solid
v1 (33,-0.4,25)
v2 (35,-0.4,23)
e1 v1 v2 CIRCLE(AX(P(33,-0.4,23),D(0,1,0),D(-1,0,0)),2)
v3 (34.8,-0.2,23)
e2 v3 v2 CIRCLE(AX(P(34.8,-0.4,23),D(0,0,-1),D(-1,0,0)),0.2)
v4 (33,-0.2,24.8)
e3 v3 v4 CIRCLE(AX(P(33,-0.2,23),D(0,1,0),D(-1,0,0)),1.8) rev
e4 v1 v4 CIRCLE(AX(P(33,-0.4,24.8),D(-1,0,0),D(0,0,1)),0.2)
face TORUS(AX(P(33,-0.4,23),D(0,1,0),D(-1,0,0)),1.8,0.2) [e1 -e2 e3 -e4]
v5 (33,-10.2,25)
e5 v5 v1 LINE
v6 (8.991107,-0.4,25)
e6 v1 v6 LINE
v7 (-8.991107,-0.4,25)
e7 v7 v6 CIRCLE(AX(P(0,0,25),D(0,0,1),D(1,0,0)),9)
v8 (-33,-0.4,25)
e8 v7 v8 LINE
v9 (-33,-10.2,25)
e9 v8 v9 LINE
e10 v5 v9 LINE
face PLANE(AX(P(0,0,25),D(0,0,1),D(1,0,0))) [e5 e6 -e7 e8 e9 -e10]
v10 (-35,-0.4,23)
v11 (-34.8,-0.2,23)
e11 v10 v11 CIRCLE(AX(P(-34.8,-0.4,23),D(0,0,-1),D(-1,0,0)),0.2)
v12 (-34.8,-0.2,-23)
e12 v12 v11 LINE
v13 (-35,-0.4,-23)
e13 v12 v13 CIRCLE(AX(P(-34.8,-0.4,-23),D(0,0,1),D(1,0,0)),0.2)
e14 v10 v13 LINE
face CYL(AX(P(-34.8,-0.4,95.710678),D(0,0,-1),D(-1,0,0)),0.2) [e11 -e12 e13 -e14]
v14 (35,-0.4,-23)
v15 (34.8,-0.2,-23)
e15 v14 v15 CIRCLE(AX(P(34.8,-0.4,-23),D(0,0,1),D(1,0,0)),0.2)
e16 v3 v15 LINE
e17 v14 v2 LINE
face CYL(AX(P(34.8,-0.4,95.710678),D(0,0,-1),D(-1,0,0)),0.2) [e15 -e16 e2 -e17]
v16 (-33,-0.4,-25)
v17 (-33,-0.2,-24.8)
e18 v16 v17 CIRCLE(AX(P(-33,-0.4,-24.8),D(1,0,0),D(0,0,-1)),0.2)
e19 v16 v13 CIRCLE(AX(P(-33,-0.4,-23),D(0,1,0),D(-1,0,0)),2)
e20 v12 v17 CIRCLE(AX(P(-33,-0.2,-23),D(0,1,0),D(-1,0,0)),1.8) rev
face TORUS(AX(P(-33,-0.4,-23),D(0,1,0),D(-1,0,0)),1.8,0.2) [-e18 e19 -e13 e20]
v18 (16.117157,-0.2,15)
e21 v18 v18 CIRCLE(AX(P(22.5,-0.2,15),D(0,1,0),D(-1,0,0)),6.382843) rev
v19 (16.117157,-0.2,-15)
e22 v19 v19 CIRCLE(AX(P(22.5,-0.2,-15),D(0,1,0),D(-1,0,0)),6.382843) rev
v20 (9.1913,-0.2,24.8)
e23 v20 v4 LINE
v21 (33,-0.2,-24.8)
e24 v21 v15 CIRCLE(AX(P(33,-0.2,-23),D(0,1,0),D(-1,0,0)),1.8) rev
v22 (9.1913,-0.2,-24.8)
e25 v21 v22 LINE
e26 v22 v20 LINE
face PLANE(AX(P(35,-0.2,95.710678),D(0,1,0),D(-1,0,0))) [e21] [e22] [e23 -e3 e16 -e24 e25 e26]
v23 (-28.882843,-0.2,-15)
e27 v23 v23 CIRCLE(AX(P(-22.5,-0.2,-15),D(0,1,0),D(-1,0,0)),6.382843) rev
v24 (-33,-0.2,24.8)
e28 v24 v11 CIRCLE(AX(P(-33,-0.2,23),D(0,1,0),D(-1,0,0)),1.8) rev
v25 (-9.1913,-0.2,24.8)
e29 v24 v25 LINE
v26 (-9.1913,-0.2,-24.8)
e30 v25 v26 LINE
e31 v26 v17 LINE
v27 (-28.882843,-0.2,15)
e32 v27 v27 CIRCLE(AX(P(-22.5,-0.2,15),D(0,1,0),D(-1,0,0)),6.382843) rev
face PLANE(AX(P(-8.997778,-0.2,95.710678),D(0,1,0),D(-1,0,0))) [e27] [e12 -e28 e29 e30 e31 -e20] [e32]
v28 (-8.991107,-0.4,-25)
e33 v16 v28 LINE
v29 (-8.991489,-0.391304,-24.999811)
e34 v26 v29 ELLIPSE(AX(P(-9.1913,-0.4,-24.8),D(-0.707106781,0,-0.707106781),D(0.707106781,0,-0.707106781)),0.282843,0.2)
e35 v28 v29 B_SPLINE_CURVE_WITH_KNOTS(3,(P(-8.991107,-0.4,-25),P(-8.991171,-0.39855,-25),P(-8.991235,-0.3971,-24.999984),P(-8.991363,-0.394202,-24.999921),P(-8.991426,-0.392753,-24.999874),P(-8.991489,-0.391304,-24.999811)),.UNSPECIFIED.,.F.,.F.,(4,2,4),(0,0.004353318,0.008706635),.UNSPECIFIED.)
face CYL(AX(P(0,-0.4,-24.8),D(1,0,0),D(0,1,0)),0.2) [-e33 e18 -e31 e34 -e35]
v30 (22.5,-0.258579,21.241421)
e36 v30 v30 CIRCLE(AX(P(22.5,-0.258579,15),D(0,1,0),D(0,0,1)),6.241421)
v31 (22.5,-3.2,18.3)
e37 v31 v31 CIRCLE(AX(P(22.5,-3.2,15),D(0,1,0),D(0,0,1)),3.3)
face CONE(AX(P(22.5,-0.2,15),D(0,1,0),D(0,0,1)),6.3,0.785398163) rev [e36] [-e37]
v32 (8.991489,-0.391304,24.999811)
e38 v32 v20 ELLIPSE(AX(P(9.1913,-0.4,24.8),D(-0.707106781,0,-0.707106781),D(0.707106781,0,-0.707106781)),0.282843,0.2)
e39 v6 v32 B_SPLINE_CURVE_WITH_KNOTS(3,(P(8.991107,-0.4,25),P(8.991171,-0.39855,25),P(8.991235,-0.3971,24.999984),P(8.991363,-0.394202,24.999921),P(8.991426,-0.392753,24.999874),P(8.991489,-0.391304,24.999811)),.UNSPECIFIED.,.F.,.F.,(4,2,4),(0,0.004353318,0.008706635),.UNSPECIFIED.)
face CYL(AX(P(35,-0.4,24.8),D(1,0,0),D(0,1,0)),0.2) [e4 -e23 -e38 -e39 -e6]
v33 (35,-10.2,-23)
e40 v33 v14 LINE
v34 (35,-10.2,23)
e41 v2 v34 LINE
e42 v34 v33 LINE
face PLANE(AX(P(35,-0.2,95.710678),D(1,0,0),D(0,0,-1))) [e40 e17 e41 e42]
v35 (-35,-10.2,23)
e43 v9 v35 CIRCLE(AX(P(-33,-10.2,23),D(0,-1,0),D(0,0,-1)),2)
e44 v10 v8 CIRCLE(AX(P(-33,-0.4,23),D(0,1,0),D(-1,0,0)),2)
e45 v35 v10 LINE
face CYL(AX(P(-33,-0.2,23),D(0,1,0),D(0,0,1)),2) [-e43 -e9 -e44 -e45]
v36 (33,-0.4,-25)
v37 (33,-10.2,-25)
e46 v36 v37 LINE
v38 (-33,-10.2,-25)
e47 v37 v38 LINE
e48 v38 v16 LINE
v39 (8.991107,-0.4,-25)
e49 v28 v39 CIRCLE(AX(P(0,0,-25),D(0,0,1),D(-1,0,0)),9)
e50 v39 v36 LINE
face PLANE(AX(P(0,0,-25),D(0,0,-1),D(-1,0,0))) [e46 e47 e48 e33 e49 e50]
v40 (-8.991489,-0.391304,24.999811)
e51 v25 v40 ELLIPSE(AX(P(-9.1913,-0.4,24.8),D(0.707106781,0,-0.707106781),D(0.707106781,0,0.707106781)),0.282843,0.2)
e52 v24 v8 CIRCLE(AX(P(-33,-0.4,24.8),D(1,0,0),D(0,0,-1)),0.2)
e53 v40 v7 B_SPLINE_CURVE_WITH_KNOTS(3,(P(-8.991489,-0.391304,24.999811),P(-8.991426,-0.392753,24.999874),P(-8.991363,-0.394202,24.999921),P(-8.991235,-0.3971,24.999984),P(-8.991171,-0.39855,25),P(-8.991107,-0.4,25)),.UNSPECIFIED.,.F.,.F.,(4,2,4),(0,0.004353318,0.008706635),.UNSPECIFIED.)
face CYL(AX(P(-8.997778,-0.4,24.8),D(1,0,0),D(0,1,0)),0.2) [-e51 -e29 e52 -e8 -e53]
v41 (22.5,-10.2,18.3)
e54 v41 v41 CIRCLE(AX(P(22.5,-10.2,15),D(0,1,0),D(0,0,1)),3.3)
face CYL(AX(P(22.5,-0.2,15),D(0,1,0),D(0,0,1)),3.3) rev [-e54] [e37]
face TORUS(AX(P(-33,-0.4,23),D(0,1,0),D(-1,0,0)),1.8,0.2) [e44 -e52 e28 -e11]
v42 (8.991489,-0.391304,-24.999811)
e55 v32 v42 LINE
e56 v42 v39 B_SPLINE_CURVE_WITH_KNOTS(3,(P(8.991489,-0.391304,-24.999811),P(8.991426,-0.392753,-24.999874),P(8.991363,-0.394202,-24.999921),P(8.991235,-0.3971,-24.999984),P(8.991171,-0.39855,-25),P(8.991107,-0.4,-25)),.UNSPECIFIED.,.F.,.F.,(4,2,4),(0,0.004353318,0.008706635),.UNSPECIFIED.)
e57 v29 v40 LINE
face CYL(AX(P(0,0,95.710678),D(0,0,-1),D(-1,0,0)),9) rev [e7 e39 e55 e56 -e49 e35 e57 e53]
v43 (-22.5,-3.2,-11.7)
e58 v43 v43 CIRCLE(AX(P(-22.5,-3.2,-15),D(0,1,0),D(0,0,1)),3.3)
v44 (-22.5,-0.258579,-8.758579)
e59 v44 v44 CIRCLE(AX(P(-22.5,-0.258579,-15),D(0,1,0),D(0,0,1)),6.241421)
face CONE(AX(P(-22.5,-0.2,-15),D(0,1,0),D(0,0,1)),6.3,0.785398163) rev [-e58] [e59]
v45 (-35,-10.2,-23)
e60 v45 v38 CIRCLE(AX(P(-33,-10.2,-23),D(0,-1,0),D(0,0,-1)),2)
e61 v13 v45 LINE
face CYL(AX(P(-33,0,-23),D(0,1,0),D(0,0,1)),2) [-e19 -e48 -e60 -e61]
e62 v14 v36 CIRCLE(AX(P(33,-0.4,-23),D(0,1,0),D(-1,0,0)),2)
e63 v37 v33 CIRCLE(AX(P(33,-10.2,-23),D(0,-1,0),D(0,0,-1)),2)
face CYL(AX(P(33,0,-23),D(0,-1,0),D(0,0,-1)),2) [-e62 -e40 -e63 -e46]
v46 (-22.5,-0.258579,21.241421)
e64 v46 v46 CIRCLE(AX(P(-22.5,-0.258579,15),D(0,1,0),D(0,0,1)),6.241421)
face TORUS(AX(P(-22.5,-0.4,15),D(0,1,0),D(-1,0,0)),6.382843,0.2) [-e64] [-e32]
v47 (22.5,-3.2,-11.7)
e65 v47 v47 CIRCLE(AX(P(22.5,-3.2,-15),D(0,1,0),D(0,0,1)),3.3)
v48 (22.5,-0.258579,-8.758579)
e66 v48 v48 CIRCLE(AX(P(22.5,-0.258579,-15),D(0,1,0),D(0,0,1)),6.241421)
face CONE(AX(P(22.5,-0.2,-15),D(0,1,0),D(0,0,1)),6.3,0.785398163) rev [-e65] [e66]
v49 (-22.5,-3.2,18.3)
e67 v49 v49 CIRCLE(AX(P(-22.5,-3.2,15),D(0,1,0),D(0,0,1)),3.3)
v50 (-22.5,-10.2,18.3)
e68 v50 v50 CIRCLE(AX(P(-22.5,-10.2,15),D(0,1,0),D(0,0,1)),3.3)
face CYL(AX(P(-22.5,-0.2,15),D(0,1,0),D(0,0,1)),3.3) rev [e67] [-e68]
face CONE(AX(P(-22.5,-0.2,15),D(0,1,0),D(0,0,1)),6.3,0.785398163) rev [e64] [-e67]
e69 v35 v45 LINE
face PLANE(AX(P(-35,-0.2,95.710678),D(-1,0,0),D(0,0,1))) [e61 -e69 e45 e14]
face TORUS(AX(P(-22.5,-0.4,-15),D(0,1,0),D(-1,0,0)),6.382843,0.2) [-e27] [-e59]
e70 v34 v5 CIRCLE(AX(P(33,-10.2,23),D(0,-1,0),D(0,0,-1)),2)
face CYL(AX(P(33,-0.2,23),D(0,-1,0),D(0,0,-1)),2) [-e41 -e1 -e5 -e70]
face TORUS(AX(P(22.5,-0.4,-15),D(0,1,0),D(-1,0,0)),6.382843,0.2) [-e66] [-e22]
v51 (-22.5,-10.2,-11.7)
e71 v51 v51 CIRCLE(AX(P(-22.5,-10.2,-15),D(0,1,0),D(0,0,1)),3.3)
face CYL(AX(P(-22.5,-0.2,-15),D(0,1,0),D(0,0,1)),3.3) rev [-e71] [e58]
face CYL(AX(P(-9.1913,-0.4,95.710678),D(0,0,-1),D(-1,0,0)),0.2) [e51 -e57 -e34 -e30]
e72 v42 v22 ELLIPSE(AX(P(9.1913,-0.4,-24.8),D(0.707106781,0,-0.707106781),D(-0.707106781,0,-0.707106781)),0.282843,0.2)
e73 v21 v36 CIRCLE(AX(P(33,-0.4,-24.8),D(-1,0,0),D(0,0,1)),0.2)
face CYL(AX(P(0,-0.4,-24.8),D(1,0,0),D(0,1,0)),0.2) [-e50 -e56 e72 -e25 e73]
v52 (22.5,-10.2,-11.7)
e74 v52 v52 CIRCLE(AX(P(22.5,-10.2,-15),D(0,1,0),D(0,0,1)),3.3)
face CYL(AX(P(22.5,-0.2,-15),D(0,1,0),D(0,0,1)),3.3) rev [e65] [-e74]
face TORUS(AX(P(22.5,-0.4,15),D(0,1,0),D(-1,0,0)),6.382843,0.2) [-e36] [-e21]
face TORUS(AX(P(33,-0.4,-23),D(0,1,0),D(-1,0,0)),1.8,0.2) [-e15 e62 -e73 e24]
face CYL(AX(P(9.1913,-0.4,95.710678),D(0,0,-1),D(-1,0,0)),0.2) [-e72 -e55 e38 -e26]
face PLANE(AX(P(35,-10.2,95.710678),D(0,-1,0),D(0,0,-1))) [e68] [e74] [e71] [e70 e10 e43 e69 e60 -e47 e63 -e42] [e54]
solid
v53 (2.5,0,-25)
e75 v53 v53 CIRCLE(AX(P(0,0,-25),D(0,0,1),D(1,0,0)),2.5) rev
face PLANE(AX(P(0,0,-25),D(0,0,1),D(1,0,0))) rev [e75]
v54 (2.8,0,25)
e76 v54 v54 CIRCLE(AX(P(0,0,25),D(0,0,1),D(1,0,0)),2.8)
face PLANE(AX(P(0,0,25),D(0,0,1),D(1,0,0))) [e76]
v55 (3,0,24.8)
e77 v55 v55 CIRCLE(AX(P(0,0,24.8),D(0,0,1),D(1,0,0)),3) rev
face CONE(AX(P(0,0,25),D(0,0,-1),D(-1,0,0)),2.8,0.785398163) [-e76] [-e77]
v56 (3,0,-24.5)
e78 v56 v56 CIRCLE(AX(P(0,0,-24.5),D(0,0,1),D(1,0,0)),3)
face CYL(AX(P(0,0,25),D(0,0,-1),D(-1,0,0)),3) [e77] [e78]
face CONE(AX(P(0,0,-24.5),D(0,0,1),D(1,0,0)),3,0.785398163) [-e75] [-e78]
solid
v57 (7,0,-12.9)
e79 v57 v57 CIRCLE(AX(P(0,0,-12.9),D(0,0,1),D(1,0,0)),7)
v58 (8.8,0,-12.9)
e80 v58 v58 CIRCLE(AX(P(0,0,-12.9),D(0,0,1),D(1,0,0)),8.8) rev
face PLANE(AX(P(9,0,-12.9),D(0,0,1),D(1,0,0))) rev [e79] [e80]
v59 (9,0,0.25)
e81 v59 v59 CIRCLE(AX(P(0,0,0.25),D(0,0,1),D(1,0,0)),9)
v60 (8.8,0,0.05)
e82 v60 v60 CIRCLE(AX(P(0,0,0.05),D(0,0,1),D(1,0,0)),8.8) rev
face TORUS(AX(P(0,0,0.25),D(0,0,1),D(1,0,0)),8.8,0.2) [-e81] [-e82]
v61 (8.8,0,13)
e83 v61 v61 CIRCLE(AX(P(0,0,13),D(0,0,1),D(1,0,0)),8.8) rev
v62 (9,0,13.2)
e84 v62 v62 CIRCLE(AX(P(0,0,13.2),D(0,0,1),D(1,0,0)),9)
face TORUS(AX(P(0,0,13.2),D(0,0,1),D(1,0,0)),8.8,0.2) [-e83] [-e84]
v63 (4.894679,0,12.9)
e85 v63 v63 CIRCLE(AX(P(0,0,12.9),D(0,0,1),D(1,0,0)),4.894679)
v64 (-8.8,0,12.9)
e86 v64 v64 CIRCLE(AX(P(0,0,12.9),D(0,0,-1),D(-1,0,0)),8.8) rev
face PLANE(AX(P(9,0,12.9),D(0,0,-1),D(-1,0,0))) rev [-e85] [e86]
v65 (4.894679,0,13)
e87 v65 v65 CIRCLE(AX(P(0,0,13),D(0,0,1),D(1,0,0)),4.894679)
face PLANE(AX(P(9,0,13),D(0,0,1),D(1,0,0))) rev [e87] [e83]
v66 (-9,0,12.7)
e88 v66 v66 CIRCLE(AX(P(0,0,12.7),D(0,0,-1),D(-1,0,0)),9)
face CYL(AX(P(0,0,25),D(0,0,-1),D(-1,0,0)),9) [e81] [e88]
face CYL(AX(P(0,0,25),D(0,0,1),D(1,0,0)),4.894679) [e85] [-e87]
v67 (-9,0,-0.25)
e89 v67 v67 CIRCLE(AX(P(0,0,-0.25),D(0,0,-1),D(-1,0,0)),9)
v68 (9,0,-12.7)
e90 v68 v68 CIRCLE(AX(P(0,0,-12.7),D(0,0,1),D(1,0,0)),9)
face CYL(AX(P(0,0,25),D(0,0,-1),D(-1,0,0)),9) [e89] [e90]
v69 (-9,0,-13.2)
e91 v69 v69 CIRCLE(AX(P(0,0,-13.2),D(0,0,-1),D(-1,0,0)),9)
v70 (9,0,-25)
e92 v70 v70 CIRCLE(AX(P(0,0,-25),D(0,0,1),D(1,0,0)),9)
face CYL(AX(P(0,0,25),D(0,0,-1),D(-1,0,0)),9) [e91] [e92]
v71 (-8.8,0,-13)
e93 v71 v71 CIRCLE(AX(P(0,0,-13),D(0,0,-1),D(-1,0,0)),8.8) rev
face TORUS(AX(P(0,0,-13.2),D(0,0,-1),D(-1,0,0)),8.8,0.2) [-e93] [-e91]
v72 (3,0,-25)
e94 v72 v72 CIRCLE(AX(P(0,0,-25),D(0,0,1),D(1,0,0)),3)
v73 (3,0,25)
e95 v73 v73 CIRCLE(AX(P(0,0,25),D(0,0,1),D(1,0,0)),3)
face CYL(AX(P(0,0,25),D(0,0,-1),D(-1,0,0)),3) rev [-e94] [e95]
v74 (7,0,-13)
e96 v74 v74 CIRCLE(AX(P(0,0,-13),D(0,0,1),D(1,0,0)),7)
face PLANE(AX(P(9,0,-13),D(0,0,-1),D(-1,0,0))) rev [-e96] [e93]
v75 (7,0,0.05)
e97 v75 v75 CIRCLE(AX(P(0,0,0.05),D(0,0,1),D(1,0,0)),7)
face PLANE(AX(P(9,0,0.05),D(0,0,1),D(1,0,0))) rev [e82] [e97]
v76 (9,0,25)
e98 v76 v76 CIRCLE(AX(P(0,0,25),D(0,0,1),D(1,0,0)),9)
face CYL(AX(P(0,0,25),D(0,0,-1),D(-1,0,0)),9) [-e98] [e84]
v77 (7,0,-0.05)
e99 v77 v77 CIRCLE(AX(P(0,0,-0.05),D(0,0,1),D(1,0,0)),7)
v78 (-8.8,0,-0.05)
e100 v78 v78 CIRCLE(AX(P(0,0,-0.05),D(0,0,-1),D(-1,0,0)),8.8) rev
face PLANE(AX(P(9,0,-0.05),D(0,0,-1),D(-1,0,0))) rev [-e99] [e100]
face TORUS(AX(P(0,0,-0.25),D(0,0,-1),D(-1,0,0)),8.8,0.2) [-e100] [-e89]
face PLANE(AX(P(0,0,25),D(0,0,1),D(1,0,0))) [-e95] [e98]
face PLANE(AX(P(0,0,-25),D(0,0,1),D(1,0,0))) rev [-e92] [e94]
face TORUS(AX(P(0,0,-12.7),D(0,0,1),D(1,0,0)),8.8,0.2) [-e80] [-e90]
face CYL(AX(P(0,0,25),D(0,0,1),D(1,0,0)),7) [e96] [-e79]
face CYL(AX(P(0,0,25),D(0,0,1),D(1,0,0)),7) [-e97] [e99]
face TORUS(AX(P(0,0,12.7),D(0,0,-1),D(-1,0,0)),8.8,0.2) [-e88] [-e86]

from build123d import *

# Parameters (mm, degrees)
SKETCH_1_R                  = 9
SKETCH_1_R_2                = 3
EXTRUDE_1_DEPTH             = 25
SKETCH_2_R                  = 3
EXTRUDE_2_DEPTH             = 25
CHAMFER_1_SIZE              = 0.2
SKETCH_3_W                  = 2
SKETCH_3_H                  = 0.1
SKETCH_3_W_2                = 4.105320606
FILLET_1_R                  = 0.2
EXTRUDE_6_DEPTH             = 50
HOLE_WIZARD_M6_1_AT_2_COUNT = 2
HOLE_WIZARD_M6_1_AT_2_PITCH = 45
HOLE_WIZARD_M6_1_AT_3_COUNT = 2
HOLE_WIZARD_M6_1_AT_3_PITCH = 30
HOLE_WIZARD_M6_1_AT_4_COUNT = 2
HOLE_WIZARD_M6_1_AT_4_PITCH = 54.083269132
FILLET_2_R                  = 0.2
FILLET_3_R                  = 2
CHAMFER_2_SIZE              = 0.5


with BuildPart() as part:
    # 草图1 → 凸台-拉伸1 (new, symmetric)
    with BuildSketch(Plane.XY):
        Circle(SKETCH_1_R)
        Circle(SKETCH_1_R_2, mode=Mode.SUBTRACT)
    extrude(amount=EXTRUDE_1_DEPTH, both=True)

    # 草图3 → 切除-旋转1 (revolve, cut)
    with BuildSketch(Plane(origin=(0, 0, 0), x_dir=(1, 0, 0), z_dir=(0, 1, 0))):
        with Locations((8, 12.95)):
            Rectangle(SKETCH_3_W, SKETCH_3_H)
        with Locations((8, 0)):
            Rectangle(SKETCH_3_W, SKETCH_3_H)
        with Locations((6.947339697, -12.95)):
            Rectangle(SKETCH_3_W_2, SKETCH_3_H)
    revolve(axis=Axis((0, 0, 25), (0, 0, -1)), mode=Mode.SUBTRACT)

    # 圆角1
    fillet_1_edges = [part.edges().sort_by_distance(p)[0] for p in [
        (-9, 0, -13),
        (-9, 0, -12.9),
        (-9, 0, -0.05),
        (-9, 0, 0.05),
        (-9, 0, 12.9),
        (-9, 0, 13),
    ]]
    fillet(fillet_1_edges, radius=FILLET_1_R)


with BuildPart() as body_2:
    # 草图2 → 凸台-拉伸2 (new, symmetric)
    with BuildSketch(Plane.XY):
        Circle(SKETCH_2_R)
    extrude(amount=EXTRUDE_2_DEPTH, both=True)

    # 倒角1
    chamfer_1_edges = [body_2.edges().sort_by_distance(p)[0] for p in [
        (-3, 0, 25),
    ]]
    chamfer(chamfer_1_edges, length=CHAMFER_1_SIZE)

    # 倒角2
    chamfer_2_edges = [body_2.edges().sort_by_distance(p)[0] for p in [
        (-3, 0, -25),
    ]]
    chamfer(chamfer_2_edges, length=CHAMFER_2_SIZE)


with BuildPart() as body_3:
    # 草图5 → 凸台-拉伸6 (new body)
    with BuildSketch(Plane(origin=(0, 0, -25), x_dir=(-1, 0, 0), z_dir=(0, 0, -1))):
        with BuildLine():
            Line((8.997777503, -0.2), (35, -0.2))
            Line((35, -0.2), (35, -10.2))
            Line((35, -10.2), (-35, -10.2))
            Line((-35, -10.2), (-35, -0.2))
            Line((-35, -0.2), (-8.997777503, -0.2))
            ThreePointArc((-8.997777503, -0.2), (0, -9), (8.997777503, -0.2))
        make_face()
    extrude(amount=-EXTRUDE_6_DEPTH)

    # 草图6 → M6 平头机械螺钉的锥形沉头孔1 (revolve, cut)
    with BuildSketch(Plane(origin=(-22.5, -0.2, -15), x_dir=(0, 0, 1), z_dir=(1, 0, 0))):
        Polygon((0, 0), (0, 10), (3.3, 10), (3.3, 3), (6.3, 0), align=None)
    hole_wizard_m6_1 = revolve(axis=Axis((-22.5, 6.15, -15), (0, -1, 0)), mode=Mode.SUBTRACT)

    # M6 平头机械螺钉的锥形沉头孔1 at 2: M6 平头机械螺钉的锥形沉头孔1 ×2
    with Locations(*[(i * HOLE_WIZARD_M6_1_AT_2_PITCH, 0, 0) for i in range(1, HOLE_WIZARD_M6_1_AT_2_COUNT)]):
        add(hole_wizard_m6_1, mode=Mode.SUBTRACT)

    # M6 平头机械螺钉的锥形沉头孔1 at 3: M6 平头机械螺钉的锥形沉头孔1 ×2
    with Locations(*[(0, 0, i * HOLE_WIZARD_M6_1_AT_3_PITCH) for i in range(1, HOLE_WIZARD_M6_1_AT_3_COUNT)]):
        add(hole_wizard_m6_1, mode=Mode.SUBTRACT)

    # M6 平头机械螺钉的锥形沉头孔1 at 4: M6 平头机械螺钉的锥形沉头孔1 ×2
    with Locations(*[Vector(0.8320502943378437, 0, 0.5547001962252291) * (i * HOLE_WIZARD_M6_1_AT_4_PITCH) for i in range(1, HOLE_WIZARD_M6_1_AT_4_COUNT)]):
        add(hole_wizard_m6_1, mode=Mode.SUBTRACT)

    # 圆角2
    # the kernel refuses this fillet: 0.2 mm, written as the material it takes off along each edge
    with BuildSketch(Plane(origin=(-8.497777503, -0.2, -25), x_dir=(0, 0, 1), z_dir=(-1, 0, 0)), Plane(origin=(35.5, -0.2, -25), x_dir=(0, 0, 1), z_dir=(-1, 0, 0))) as fillet_2_piece_1:
        with BuildLine():
            CenterArc((FILLET_2_R, -FILLET_2_R), FILLET_2_R, 90, 90)
            Line((0, -FILLET_2_R), (0, 0))
            Line((0, 0), (FILLET_2_R, 0))
        make_face()
    extrude(amount=27.002222497, mode=Mode.SUBTRACT)
    with BuildSketch(Plane(origin=(22.5, -0.2, 15), x_dir=(0, 0, 1), z_dir=(1, 0, 0))) as fillet_2_piece_2:
        with BuildLine():
            CenterArc((6.3 + FILLET_2_R * 0.414213562373, FILLET_2_R), FILLET_2_R, 225, 45)
            Line((6.3 - FILLET_2_R * 0.292893218813, FILLET_2_R * 0.292893218813), (6.3, 0))
            Line((6.3, 0), (6.3 + FILLET_2_R * 0.414213562373, 0))
        make_face()
    revolve(axis=Axis((22.5, -0.2, 15), (0, -1, 0)), mode=Mode.SUBTRACT)
    with BuildSketch(Plane(origin=(-22.5, -0.2, 15), x_dir=(0, 0, 1), z_dir=(1, 0, 0))) as fillet_2_piece_3:
        with BuildLine():
            CenterArc((6.3 + FILLET_2_R * 0.414213562373, FILLET_2_R), FILLET_2_R, 225, 45)
            Line((6.3 - FILLET_2_R * 0.292893218813, FILLET_2_R * 0.292893218813), (6.3, 0))
            Line((6.3, 0), (6.3 + FILLET_2_R * 0.414213562373, 0))
        make_face()
    revolve(axis=Axis((-22.5, -0.2, 15), (0, -1, 0)), mode=Mode.SUBTRACT)
    with BuildSketch(Plane(origin=(-35, -0.2, -25.5), x_dir=(1, 0, 0), z_dir=(0, 0, 1))) as fillet_2_piece_4:
        with BuildLine():
            CenterArc((FILLET_2_R, -FILLET_2_R), FILLET_2_R, 90, 90)
            Line((0, -FILLET_2_R), (0, 0))
            Line((0, 0), (FILLET_2_R, 0))
        make_face()
    extrude(amount=51, mode=Mode.SUBTRACT)
    with BuildSketch(Plane(origin=(-8.497777503, -0.2, 25), x_dir=(0, 0, -1), z_dir=(-1, 0, 0)), Plane(origin=(35.5, -0.2, 25), x_dir=(0, 0, -1), z_dir=(-1, 0, 0))) as fillet_2_piece_5:
        with BuildLine():
            CenterArc((FILLET_2_R, FILLET_2_R), FILLET_2_R, 180, 90)
            Line((0, FILLET_2_R), (0, 0))
            Line((0, 0), (FILLET_2_R, 0))
        make_face()
    extrude(amount=27.002222497, mode=Mode.SUBTRACT)
    with BuildSketch(Plane(origin=(22.5, -0.2, -15), x_dir=(0, 0, 1), z_dir=(1, 0, 0))) as fillet_2_piece_6:
        with BuildLine():
            CenterArc((6.3 + FILLET_2_R * 0.414213562373, FILLET_2_R), FILLET_2_R, 225, 45)
            Line((6.3 - FILLET_2_R * 0.292893218813, FILLET_2_R * 0.292893218813), (6.3, 0))
            Line((6.3, 0), (6.3 + FILLET_2_R * 0.414213562373, 0))
        make_face()
    revolve(axis=Axis((22.5, -0.2, -15), (0, -1, 0)), mode=Mode.SUBTRACT)
    with BuildSketch(Plane(origin=(-8.997777503, -0.2, -25.483806828), x_dir=(0.03285209900407031, -0.9994602241165111, 0), z_dir=(0, 0, 1))) as fillet_2_piece_7:
        with BuildLine():
            CenterArc((0.193534417, -0.199988692), FILLET_2_R, 90.609281004, 87.508093631)
            Line((-0.006357628, -0.193418272), (0, 0))
            ThreePointArc((0, 0), (0.095703833, -0.00050886), (0.191407665, 0))
        make_face()
    extrude(amount=50.967613655, mode=Mode.SUBTRACT)
    with BuildSketch(Plane(origin=(8.997777503, -0.2, -25.483806828), x_dir=(-0.03285209900407052, -0.9994602241165111, 0), z_dir=(0, 0, 1))) as fillet_2_piece_8:
        with BuildLine():
            CenterArc((0.193534417, 0.199988692), FILLET_2_R, 181.882625365, 87.508093631)
            Line((-0.006357628, 0.193418272), (0, 0))
            ThreePointArc((0, 0), (0.095703833, 0.00050886), (0.191407665, 0))
        make_face()
    extrude(amount=50.967613655, mode=Mode.SUBTRACT)
    with BuildSketch(Plane(origin=(35, -0.2, -25.5), x_dir=(-1, 0, 0), z_dir=(0, 0, 1))) as fillet_2_piece_9:
        with BuildLine():
            CenterArc((FILLET_2_R, FILLET_2_R), FILLET_2_R, 180, 90)
            Line((0, FILLET_2_R), (0, 0))
            Line((0, 0), (FILLET_2_R, 0))
        make_face()
    extrude(amount=51, mode=Mode.SUBTRACT)
    with BuildSketch(Plane(origin=(-22.5, -0.2, -15), x_dir=(0, 0, 1), z_dir=(1, 0, 0))) as fillet_2_piece_10:
        with BuildLine():
            CenterArc((6.3 + FILLET_2_R * 0.414213562373, FILLET_2_R), FILLET_2_R, 225, 45)
            Line((6.3 - FILLET_2_R * 0.292893218813, FILLET_2_R * 0.292893218813), (6.3, 0))
            Line((6.3, 0), (6.3 + FILLET_2_R * 0.414213562373, 0))
        make_face()
    revolve(axis=Axis((-22.5, -0.2, -15), (0, -1, 0)), mode=Mode.SUBTRACT)

    # 圆角3
    # the kernel refuses this fillet: 2 mm, written as the material it takes off along each edge
    with BuildSketch(Plane(origin=(33, -0.2, 23), x_dir=(0, 0, 1), z_dir=(-1, 0, 0))) as fillet_3_piece_1:
        with BuildLine():
            CenterArc((1.8, -0.2), 0.2, 0, 90)
            Line((2, -0.2), (2, 0))
            Line((2, 0), (1.8, 0))
        make_face()
    revolve(axis=Axis((33, -0.2, 23), (0, 1, 0)), revolution_arc=90, mode=Mode.SUBTRACT)
    with BuildSketch(Plane(origin=(33, -0.2, -23), x_dir=(1, 0, 0), z_dir=(0, 0, 1))) as fillet_3_piece_2:
        with BuildLine():
            CenterArc((1.8, -0.2), 0.2, 0, 90)
            Line((2, -0.2), (2, 0))
            Line((2, 0), (1.8, 0))
        make_face()
    revolve(axis=Axis((33, -0.2, -23), (0, 1, 0)), revolution_arc=90, mode=Mode.SUBTRACT)
    with BuildSketch(Plane(origin=(-33, -0.2, 23), x_dir=(-1, 0, 0), z_dir=(0, 0, -1))) as fillet_3_piece_3:
        with BuildLine():
            CenterArc((1.8, -0.2), 0.2, 0, 90)
            Line((2, -0.2), (2, 0))
            Line((2, 0), (1.8, 0))
        make_face()
    revolve(axis=Axis((-33, -0.2, 23), (0, 1, 0)), revolution_arc=90, mode=Mode.SUBTRACT)
    with BuildSketch(Plane(origin=(-33, -0.2, -23), x_dir=(0, 0, -1), z_dir=(1, 0, 0))) as fillet_3_piece_4:
        with BuildLine():
            CenterArc((1.8, -0.2), 0.2, 0, 90)
            Line((2, -0.2), (2, 0))
            Line((2, 0), (1.8, 0))
        make_face()
    revolve(axis=Axis((-33, -0.2, -23), (0, 1, 0)), revolution_arc=90, mode=Mode.SUBTRACT)
    with BuildSketch(Plane(origin=(-35, -0.2, -25), x_dir=(1, 0, 0), z_dir=(0, -1, 0)), Plane(origin=(35, -15.2, -25), x_dir=(-1, 0, 0), z_dir=(0, 1, 0))) as fillet_3_piece_5:
        with BuildLine():
            CenterArc((FILLET_3_R, FILLET_3_R), FILLET_3_R, 180, 90)
            Line((0, FILLET_3_R), (0, 0))
            Line((0, 0), (FILLET_3_R, 0))
        make_face()
    extrude(amount=15, mode=Mode.SUBTRACT)
    with BuildSketch(Plane(origin=(-35, -0.2, 25), x_dir=(1, 0, 0), z_dir=(0, -1, 0)), Plane(origin=(35, -15.2, 25), x_dir=(-1, 0, 0), z_dir=(0, 1, 0))) as fillet_3_piece_6:
        with BuildLine():
            CenterArc((FILLET_3_R, -FILLET_3_R), FILLET_3_R, 90, 90)
            Line((0, -FILLET_3_R), (0, 0))
            Line((0, 0), (FILLET_3_R, 0))
        make_face()
    extrude(amount=15, mode=Mode.SUBTRACT)


solid = Compound([part.part, body_2.part, body_3.part])
